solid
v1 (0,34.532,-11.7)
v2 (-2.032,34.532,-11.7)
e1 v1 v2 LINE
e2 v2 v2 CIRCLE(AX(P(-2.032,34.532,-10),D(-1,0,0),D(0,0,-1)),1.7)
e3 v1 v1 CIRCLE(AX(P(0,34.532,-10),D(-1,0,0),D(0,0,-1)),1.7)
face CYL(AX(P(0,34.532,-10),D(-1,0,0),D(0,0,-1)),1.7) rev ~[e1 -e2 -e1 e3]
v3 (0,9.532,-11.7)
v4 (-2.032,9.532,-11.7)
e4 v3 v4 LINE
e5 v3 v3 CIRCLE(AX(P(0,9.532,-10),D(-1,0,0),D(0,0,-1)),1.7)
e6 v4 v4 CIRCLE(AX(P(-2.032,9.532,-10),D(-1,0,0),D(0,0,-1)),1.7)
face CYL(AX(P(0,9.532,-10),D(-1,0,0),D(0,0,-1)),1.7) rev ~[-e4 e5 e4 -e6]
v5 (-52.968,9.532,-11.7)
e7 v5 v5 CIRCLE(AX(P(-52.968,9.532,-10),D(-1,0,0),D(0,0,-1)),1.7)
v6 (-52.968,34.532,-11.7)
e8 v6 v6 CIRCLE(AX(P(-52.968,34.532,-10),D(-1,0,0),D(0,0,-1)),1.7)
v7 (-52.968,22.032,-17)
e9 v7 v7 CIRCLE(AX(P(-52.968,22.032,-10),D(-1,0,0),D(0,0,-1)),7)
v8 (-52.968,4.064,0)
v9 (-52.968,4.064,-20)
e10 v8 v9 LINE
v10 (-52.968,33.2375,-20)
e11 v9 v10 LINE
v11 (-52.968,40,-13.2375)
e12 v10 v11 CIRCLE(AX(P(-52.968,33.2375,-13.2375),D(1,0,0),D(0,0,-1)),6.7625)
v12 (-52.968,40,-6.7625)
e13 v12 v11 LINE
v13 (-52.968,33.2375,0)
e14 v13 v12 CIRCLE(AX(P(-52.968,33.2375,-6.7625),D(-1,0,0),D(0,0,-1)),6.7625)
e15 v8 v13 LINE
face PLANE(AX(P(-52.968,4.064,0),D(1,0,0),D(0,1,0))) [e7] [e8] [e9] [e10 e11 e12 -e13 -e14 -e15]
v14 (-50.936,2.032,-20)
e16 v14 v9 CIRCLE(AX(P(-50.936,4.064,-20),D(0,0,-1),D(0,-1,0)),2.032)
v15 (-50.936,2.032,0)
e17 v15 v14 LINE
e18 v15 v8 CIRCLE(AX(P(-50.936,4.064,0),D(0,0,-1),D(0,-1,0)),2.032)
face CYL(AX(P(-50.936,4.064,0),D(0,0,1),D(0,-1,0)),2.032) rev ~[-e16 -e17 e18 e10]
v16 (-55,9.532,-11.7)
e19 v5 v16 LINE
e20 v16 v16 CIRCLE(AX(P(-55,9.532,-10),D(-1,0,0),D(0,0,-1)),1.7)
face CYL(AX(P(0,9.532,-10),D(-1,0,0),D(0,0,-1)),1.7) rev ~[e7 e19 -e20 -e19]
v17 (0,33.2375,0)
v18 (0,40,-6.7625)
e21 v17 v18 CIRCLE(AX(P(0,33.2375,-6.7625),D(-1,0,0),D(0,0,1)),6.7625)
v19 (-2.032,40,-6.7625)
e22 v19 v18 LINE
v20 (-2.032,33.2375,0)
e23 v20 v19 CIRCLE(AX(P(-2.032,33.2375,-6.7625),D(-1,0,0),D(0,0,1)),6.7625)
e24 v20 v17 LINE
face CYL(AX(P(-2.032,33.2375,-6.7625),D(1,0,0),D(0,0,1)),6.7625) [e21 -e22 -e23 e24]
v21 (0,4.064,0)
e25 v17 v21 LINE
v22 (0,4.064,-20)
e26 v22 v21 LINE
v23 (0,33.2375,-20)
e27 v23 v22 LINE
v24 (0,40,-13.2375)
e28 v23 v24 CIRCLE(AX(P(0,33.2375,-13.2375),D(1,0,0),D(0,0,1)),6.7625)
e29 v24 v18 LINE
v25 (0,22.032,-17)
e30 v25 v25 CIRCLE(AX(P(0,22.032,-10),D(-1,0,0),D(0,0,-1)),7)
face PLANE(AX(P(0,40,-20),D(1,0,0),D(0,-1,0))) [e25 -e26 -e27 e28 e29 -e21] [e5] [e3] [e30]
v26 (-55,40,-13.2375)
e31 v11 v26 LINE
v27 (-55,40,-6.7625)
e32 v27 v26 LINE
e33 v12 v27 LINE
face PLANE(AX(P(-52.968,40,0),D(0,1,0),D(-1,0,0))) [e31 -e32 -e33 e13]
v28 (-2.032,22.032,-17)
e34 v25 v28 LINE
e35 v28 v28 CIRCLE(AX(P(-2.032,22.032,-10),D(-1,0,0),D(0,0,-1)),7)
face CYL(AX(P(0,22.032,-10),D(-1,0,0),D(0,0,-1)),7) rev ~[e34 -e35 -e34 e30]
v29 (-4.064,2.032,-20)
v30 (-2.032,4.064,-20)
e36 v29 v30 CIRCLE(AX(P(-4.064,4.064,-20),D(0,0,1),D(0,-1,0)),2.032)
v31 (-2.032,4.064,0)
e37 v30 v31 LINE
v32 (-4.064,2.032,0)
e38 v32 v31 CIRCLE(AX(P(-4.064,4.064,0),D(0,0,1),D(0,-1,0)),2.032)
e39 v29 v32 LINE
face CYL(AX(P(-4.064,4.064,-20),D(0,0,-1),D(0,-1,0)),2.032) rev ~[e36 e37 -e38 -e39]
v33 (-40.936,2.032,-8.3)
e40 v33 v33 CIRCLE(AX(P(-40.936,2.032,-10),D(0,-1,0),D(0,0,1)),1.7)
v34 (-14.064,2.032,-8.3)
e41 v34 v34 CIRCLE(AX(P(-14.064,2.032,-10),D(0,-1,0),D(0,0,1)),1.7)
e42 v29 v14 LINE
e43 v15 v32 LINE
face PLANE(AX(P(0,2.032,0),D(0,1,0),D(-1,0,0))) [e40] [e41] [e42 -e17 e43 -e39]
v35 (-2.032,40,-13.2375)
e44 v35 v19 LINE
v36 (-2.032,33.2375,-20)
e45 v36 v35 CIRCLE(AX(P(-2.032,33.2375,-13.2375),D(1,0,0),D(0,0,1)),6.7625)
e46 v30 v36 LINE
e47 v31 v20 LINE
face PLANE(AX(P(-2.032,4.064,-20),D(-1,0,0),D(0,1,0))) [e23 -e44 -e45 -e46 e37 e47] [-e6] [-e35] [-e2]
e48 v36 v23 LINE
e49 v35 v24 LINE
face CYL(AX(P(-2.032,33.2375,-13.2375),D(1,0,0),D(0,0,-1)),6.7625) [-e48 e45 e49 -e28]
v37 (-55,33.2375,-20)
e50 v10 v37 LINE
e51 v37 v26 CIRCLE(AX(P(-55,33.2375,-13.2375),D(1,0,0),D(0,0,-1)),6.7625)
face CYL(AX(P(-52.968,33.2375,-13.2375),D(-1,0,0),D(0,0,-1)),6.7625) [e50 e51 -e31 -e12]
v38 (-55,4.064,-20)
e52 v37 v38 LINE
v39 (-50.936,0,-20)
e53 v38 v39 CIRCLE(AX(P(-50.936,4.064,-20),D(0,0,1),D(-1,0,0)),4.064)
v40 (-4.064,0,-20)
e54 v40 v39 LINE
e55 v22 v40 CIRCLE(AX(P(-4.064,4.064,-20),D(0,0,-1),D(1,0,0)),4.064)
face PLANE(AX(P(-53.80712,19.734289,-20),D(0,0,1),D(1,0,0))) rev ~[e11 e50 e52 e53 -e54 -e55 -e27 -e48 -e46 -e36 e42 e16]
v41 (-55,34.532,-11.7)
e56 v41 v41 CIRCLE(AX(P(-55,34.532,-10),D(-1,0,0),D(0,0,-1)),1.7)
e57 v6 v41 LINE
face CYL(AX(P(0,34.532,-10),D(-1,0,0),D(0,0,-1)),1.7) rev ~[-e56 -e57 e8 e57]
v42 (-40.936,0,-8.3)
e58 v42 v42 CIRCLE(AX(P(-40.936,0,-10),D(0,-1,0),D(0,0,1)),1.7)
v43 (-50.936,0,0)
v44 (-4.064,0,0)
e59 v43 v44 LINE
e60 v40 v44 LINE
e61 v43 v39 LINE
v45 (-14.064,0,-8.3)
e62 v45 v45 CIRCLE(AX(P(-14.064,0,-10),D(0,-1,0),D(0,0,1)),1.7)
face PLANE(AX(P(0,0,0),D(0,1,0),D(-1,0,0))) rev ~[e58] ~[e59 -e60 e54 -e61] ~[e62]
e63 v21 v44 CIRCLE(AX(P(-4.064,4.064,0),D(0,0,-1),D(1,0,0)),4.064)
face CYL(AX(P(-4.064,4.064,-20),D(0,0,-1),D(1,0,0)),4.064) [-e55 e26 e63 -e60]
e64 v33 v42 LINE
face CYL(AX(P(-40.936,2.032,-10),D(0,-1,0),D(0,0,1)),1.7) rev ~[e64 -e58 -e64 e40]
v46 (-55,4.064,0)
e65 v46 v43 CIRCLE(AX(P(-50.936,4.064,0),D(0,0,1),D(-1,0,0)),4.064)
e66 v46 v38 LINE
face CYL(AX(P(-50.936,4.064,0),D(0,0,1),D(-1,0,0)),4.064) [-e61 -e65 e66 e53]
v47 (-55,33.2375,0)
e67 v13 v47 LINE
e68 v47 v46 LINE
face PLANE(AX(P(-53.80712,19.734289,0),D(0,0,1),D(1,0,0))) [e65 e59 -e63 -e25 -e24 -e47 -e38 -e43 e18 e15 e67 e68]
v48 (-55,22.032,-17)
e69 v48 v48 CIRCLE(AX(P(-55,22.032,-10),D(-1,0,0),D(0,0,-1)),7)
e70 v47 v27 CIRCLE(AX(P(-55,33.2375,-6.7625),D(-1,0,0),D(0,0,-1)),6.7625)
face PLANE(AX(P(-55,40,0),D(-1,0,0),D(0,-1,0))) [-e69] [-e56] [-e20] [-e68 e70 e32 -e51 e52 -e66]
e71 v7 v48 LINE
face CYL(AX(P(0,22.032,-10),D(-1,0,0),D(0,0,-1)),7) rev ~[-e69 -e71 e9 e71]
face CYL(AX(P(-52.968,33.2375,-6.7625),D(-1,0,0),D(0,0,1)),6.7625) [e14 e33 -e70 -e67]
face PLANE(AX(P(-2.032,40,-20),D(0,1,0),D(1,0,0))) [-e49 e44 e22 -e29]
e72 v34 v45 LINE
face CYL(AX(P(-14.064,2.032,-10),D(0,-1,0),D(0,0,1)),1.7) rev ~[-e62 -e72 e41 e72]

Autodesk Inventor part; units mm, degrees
ref_plane "YZ Plane" through (0, 0, 0) normal (1, 0, 0) x (0, 1, 0)
ref_plane "XZ Plane" through (0, 0, 0) normal (0, 1, 0) x (-1, 0, 0)
ref_plane "XY Plane" through (0, 0, 0) normal (0, 0, 1) x (1, 0, 0)
sketch "Sketch3" plane through (0, 0, 0) normal (0, 1, 0) x (-1, 0, 0)
  line L0 (55, 0) -> (0, 0)
  line L1 (0, 0) -> (0, -20)
  line L2 (0, -20) -> (55, -20)
  line L3 (55, -20) -> (55, 0)
  dimension "d9" = 55
  dimension "d10" = 20
extrude "Plate1" add sketch "Sketch3" along normal blind 2.032
sketch "Sketch4" plane through (-52.968, 0, 0) normal (-1, 0, 0) x (0, -1, 0)
  line L0 (0, -20) -> (0, 0)
  line L1 (0, 0) -> (-40, 0)
  line L2 (-40, 0) -> (-40, -20)
  line L3 (-40, -20) -> (0, -20)
edge flange "Flange1" height 40 angle 90 thickness 2.032 bend radius 2.032 thickness toward (-1, 0, 0) relief tear relief width 2.032 relief depth 1.016 corner gap 2.032 corner form 0 edges at (-55, 2.032, -10) (0, 2.032, -10) wall of the first edge with corners at (-52.968, 0, -20) (-52.968, 0, 0) (-52.968, 40, 0) (-52.968, 40, -20)
bend "Bend1"
corner "Corner1"
sketch "Sketch5" plane through (0, 40, 0) normal (1, 0, 0) x (0, 0, -1)
  line L0 (0, -35.936) -> (20, -35.936) projected
  line L1 (0, -35.936) -> (20, -35.936) projected
  line L2 (20, 0) -> (20, -35.936) projected
  line L3 (0, 0) -> (20, 0) projected
  line L4 (0, -35.936) -> (0, 0) projected
  line L5 (20, -35.936) -> (20, 0) projected
  line L6 (20, -17.968) -> (0, -17.968) construction
  line L7 (0, -35.936) -> (0, 0) projected
  point P0 (0, -40)
  point P1 (10, -5.468)
  point P2 (10, -17.968)
  point P3 (10, -30.468)
  point P4 (10, -35.936)
  point P5 (10, -17.968)
  dimension "d22" = 12.5
  dimension "d23" = 12.5
hole "Hole1" at (0, 9.532, -10) at (0, 34.532, -10) direction (-1, 0, 0) diameter 3.4 depth 55 clearance for "Socket Head Cap Screw" size "M3" standard "Ansi Metric M Profile"
hole "Hole2" at (0, 22.032, -10) direction (-1, 0, 0) diameter 14 depth 55
fillet "Fillet1" radius 6.7625 4 edges at (-53.984, 40, 0) (-53.984, 40, -20) (-1.016, 40, -20) (-1.016, 40, 0)
sketch "Sketch6" plane through (0, 2.032, 0) normal (0, 1, 0) x (1, 0, 0)
  line L0 (-4.064, 0) -> (-4.064, 20) projected
  line L1 (-50.936, 20) -> (-4.064, 20) projected
  line L2 (-50.936, 20) -> (-50.936, 0) projected
  line L3 (-4.064, 0) -> (-50.936, 0) projected
  line L4 (-4.064, 0) -> (-4.064, 20) projected
  line L5 (-4.064, 10) -> (-14.064, 10) construction
  line L6 (-40.936, 10) -> (-50.936, 10) construction
  point P0 (0, 0)
  dimension "d39" = 10
hole "Hole3" at (-40.936, 2.032, -10) at (-14.064, 2.032, -10) direction (0, -1, 0) diameter 3.4 end through all clearance for "Socket Head Cap Screw" size "M3" standard "Ansi Metric M Profile"
equation "\"d29\" = Thickness"
equation "\"d11\" = Thickness"
equation "\"d12\" = BendReliefWidth"
equation "\"d13\" = BendReliefDepth"
equation "\"d14\" = MinimumRemnant"
equation "\"d15\" = TransitionRadius"
equation "\"d18\" = BendRadius"
equation "\"d19\" = CornerReliefSize"
equation "\"d20\" = GapSize"
equation "\"d21\" = JacobiRadiusSize"
equation "\"BendRadius\" = Thickness"
equation "\"BendReliefWidth\" = Thickness"
equation "\"BendReliefDepth\" = 0.5 * Thickness"
equation "\"CornerReliefSize\" = 4 * Thickness"
equation "\"MinimumRemnant\" = 2 * Thickness"
equation "\"TransitionRadius\" = BendRadius"
equation "\"JacobiRadiusSize\" = BendRadius"
equation "\"GapSize\" = Thickness"
equation "\"Thickness\" = 2.032"
properties part number "Flat Pattern"
